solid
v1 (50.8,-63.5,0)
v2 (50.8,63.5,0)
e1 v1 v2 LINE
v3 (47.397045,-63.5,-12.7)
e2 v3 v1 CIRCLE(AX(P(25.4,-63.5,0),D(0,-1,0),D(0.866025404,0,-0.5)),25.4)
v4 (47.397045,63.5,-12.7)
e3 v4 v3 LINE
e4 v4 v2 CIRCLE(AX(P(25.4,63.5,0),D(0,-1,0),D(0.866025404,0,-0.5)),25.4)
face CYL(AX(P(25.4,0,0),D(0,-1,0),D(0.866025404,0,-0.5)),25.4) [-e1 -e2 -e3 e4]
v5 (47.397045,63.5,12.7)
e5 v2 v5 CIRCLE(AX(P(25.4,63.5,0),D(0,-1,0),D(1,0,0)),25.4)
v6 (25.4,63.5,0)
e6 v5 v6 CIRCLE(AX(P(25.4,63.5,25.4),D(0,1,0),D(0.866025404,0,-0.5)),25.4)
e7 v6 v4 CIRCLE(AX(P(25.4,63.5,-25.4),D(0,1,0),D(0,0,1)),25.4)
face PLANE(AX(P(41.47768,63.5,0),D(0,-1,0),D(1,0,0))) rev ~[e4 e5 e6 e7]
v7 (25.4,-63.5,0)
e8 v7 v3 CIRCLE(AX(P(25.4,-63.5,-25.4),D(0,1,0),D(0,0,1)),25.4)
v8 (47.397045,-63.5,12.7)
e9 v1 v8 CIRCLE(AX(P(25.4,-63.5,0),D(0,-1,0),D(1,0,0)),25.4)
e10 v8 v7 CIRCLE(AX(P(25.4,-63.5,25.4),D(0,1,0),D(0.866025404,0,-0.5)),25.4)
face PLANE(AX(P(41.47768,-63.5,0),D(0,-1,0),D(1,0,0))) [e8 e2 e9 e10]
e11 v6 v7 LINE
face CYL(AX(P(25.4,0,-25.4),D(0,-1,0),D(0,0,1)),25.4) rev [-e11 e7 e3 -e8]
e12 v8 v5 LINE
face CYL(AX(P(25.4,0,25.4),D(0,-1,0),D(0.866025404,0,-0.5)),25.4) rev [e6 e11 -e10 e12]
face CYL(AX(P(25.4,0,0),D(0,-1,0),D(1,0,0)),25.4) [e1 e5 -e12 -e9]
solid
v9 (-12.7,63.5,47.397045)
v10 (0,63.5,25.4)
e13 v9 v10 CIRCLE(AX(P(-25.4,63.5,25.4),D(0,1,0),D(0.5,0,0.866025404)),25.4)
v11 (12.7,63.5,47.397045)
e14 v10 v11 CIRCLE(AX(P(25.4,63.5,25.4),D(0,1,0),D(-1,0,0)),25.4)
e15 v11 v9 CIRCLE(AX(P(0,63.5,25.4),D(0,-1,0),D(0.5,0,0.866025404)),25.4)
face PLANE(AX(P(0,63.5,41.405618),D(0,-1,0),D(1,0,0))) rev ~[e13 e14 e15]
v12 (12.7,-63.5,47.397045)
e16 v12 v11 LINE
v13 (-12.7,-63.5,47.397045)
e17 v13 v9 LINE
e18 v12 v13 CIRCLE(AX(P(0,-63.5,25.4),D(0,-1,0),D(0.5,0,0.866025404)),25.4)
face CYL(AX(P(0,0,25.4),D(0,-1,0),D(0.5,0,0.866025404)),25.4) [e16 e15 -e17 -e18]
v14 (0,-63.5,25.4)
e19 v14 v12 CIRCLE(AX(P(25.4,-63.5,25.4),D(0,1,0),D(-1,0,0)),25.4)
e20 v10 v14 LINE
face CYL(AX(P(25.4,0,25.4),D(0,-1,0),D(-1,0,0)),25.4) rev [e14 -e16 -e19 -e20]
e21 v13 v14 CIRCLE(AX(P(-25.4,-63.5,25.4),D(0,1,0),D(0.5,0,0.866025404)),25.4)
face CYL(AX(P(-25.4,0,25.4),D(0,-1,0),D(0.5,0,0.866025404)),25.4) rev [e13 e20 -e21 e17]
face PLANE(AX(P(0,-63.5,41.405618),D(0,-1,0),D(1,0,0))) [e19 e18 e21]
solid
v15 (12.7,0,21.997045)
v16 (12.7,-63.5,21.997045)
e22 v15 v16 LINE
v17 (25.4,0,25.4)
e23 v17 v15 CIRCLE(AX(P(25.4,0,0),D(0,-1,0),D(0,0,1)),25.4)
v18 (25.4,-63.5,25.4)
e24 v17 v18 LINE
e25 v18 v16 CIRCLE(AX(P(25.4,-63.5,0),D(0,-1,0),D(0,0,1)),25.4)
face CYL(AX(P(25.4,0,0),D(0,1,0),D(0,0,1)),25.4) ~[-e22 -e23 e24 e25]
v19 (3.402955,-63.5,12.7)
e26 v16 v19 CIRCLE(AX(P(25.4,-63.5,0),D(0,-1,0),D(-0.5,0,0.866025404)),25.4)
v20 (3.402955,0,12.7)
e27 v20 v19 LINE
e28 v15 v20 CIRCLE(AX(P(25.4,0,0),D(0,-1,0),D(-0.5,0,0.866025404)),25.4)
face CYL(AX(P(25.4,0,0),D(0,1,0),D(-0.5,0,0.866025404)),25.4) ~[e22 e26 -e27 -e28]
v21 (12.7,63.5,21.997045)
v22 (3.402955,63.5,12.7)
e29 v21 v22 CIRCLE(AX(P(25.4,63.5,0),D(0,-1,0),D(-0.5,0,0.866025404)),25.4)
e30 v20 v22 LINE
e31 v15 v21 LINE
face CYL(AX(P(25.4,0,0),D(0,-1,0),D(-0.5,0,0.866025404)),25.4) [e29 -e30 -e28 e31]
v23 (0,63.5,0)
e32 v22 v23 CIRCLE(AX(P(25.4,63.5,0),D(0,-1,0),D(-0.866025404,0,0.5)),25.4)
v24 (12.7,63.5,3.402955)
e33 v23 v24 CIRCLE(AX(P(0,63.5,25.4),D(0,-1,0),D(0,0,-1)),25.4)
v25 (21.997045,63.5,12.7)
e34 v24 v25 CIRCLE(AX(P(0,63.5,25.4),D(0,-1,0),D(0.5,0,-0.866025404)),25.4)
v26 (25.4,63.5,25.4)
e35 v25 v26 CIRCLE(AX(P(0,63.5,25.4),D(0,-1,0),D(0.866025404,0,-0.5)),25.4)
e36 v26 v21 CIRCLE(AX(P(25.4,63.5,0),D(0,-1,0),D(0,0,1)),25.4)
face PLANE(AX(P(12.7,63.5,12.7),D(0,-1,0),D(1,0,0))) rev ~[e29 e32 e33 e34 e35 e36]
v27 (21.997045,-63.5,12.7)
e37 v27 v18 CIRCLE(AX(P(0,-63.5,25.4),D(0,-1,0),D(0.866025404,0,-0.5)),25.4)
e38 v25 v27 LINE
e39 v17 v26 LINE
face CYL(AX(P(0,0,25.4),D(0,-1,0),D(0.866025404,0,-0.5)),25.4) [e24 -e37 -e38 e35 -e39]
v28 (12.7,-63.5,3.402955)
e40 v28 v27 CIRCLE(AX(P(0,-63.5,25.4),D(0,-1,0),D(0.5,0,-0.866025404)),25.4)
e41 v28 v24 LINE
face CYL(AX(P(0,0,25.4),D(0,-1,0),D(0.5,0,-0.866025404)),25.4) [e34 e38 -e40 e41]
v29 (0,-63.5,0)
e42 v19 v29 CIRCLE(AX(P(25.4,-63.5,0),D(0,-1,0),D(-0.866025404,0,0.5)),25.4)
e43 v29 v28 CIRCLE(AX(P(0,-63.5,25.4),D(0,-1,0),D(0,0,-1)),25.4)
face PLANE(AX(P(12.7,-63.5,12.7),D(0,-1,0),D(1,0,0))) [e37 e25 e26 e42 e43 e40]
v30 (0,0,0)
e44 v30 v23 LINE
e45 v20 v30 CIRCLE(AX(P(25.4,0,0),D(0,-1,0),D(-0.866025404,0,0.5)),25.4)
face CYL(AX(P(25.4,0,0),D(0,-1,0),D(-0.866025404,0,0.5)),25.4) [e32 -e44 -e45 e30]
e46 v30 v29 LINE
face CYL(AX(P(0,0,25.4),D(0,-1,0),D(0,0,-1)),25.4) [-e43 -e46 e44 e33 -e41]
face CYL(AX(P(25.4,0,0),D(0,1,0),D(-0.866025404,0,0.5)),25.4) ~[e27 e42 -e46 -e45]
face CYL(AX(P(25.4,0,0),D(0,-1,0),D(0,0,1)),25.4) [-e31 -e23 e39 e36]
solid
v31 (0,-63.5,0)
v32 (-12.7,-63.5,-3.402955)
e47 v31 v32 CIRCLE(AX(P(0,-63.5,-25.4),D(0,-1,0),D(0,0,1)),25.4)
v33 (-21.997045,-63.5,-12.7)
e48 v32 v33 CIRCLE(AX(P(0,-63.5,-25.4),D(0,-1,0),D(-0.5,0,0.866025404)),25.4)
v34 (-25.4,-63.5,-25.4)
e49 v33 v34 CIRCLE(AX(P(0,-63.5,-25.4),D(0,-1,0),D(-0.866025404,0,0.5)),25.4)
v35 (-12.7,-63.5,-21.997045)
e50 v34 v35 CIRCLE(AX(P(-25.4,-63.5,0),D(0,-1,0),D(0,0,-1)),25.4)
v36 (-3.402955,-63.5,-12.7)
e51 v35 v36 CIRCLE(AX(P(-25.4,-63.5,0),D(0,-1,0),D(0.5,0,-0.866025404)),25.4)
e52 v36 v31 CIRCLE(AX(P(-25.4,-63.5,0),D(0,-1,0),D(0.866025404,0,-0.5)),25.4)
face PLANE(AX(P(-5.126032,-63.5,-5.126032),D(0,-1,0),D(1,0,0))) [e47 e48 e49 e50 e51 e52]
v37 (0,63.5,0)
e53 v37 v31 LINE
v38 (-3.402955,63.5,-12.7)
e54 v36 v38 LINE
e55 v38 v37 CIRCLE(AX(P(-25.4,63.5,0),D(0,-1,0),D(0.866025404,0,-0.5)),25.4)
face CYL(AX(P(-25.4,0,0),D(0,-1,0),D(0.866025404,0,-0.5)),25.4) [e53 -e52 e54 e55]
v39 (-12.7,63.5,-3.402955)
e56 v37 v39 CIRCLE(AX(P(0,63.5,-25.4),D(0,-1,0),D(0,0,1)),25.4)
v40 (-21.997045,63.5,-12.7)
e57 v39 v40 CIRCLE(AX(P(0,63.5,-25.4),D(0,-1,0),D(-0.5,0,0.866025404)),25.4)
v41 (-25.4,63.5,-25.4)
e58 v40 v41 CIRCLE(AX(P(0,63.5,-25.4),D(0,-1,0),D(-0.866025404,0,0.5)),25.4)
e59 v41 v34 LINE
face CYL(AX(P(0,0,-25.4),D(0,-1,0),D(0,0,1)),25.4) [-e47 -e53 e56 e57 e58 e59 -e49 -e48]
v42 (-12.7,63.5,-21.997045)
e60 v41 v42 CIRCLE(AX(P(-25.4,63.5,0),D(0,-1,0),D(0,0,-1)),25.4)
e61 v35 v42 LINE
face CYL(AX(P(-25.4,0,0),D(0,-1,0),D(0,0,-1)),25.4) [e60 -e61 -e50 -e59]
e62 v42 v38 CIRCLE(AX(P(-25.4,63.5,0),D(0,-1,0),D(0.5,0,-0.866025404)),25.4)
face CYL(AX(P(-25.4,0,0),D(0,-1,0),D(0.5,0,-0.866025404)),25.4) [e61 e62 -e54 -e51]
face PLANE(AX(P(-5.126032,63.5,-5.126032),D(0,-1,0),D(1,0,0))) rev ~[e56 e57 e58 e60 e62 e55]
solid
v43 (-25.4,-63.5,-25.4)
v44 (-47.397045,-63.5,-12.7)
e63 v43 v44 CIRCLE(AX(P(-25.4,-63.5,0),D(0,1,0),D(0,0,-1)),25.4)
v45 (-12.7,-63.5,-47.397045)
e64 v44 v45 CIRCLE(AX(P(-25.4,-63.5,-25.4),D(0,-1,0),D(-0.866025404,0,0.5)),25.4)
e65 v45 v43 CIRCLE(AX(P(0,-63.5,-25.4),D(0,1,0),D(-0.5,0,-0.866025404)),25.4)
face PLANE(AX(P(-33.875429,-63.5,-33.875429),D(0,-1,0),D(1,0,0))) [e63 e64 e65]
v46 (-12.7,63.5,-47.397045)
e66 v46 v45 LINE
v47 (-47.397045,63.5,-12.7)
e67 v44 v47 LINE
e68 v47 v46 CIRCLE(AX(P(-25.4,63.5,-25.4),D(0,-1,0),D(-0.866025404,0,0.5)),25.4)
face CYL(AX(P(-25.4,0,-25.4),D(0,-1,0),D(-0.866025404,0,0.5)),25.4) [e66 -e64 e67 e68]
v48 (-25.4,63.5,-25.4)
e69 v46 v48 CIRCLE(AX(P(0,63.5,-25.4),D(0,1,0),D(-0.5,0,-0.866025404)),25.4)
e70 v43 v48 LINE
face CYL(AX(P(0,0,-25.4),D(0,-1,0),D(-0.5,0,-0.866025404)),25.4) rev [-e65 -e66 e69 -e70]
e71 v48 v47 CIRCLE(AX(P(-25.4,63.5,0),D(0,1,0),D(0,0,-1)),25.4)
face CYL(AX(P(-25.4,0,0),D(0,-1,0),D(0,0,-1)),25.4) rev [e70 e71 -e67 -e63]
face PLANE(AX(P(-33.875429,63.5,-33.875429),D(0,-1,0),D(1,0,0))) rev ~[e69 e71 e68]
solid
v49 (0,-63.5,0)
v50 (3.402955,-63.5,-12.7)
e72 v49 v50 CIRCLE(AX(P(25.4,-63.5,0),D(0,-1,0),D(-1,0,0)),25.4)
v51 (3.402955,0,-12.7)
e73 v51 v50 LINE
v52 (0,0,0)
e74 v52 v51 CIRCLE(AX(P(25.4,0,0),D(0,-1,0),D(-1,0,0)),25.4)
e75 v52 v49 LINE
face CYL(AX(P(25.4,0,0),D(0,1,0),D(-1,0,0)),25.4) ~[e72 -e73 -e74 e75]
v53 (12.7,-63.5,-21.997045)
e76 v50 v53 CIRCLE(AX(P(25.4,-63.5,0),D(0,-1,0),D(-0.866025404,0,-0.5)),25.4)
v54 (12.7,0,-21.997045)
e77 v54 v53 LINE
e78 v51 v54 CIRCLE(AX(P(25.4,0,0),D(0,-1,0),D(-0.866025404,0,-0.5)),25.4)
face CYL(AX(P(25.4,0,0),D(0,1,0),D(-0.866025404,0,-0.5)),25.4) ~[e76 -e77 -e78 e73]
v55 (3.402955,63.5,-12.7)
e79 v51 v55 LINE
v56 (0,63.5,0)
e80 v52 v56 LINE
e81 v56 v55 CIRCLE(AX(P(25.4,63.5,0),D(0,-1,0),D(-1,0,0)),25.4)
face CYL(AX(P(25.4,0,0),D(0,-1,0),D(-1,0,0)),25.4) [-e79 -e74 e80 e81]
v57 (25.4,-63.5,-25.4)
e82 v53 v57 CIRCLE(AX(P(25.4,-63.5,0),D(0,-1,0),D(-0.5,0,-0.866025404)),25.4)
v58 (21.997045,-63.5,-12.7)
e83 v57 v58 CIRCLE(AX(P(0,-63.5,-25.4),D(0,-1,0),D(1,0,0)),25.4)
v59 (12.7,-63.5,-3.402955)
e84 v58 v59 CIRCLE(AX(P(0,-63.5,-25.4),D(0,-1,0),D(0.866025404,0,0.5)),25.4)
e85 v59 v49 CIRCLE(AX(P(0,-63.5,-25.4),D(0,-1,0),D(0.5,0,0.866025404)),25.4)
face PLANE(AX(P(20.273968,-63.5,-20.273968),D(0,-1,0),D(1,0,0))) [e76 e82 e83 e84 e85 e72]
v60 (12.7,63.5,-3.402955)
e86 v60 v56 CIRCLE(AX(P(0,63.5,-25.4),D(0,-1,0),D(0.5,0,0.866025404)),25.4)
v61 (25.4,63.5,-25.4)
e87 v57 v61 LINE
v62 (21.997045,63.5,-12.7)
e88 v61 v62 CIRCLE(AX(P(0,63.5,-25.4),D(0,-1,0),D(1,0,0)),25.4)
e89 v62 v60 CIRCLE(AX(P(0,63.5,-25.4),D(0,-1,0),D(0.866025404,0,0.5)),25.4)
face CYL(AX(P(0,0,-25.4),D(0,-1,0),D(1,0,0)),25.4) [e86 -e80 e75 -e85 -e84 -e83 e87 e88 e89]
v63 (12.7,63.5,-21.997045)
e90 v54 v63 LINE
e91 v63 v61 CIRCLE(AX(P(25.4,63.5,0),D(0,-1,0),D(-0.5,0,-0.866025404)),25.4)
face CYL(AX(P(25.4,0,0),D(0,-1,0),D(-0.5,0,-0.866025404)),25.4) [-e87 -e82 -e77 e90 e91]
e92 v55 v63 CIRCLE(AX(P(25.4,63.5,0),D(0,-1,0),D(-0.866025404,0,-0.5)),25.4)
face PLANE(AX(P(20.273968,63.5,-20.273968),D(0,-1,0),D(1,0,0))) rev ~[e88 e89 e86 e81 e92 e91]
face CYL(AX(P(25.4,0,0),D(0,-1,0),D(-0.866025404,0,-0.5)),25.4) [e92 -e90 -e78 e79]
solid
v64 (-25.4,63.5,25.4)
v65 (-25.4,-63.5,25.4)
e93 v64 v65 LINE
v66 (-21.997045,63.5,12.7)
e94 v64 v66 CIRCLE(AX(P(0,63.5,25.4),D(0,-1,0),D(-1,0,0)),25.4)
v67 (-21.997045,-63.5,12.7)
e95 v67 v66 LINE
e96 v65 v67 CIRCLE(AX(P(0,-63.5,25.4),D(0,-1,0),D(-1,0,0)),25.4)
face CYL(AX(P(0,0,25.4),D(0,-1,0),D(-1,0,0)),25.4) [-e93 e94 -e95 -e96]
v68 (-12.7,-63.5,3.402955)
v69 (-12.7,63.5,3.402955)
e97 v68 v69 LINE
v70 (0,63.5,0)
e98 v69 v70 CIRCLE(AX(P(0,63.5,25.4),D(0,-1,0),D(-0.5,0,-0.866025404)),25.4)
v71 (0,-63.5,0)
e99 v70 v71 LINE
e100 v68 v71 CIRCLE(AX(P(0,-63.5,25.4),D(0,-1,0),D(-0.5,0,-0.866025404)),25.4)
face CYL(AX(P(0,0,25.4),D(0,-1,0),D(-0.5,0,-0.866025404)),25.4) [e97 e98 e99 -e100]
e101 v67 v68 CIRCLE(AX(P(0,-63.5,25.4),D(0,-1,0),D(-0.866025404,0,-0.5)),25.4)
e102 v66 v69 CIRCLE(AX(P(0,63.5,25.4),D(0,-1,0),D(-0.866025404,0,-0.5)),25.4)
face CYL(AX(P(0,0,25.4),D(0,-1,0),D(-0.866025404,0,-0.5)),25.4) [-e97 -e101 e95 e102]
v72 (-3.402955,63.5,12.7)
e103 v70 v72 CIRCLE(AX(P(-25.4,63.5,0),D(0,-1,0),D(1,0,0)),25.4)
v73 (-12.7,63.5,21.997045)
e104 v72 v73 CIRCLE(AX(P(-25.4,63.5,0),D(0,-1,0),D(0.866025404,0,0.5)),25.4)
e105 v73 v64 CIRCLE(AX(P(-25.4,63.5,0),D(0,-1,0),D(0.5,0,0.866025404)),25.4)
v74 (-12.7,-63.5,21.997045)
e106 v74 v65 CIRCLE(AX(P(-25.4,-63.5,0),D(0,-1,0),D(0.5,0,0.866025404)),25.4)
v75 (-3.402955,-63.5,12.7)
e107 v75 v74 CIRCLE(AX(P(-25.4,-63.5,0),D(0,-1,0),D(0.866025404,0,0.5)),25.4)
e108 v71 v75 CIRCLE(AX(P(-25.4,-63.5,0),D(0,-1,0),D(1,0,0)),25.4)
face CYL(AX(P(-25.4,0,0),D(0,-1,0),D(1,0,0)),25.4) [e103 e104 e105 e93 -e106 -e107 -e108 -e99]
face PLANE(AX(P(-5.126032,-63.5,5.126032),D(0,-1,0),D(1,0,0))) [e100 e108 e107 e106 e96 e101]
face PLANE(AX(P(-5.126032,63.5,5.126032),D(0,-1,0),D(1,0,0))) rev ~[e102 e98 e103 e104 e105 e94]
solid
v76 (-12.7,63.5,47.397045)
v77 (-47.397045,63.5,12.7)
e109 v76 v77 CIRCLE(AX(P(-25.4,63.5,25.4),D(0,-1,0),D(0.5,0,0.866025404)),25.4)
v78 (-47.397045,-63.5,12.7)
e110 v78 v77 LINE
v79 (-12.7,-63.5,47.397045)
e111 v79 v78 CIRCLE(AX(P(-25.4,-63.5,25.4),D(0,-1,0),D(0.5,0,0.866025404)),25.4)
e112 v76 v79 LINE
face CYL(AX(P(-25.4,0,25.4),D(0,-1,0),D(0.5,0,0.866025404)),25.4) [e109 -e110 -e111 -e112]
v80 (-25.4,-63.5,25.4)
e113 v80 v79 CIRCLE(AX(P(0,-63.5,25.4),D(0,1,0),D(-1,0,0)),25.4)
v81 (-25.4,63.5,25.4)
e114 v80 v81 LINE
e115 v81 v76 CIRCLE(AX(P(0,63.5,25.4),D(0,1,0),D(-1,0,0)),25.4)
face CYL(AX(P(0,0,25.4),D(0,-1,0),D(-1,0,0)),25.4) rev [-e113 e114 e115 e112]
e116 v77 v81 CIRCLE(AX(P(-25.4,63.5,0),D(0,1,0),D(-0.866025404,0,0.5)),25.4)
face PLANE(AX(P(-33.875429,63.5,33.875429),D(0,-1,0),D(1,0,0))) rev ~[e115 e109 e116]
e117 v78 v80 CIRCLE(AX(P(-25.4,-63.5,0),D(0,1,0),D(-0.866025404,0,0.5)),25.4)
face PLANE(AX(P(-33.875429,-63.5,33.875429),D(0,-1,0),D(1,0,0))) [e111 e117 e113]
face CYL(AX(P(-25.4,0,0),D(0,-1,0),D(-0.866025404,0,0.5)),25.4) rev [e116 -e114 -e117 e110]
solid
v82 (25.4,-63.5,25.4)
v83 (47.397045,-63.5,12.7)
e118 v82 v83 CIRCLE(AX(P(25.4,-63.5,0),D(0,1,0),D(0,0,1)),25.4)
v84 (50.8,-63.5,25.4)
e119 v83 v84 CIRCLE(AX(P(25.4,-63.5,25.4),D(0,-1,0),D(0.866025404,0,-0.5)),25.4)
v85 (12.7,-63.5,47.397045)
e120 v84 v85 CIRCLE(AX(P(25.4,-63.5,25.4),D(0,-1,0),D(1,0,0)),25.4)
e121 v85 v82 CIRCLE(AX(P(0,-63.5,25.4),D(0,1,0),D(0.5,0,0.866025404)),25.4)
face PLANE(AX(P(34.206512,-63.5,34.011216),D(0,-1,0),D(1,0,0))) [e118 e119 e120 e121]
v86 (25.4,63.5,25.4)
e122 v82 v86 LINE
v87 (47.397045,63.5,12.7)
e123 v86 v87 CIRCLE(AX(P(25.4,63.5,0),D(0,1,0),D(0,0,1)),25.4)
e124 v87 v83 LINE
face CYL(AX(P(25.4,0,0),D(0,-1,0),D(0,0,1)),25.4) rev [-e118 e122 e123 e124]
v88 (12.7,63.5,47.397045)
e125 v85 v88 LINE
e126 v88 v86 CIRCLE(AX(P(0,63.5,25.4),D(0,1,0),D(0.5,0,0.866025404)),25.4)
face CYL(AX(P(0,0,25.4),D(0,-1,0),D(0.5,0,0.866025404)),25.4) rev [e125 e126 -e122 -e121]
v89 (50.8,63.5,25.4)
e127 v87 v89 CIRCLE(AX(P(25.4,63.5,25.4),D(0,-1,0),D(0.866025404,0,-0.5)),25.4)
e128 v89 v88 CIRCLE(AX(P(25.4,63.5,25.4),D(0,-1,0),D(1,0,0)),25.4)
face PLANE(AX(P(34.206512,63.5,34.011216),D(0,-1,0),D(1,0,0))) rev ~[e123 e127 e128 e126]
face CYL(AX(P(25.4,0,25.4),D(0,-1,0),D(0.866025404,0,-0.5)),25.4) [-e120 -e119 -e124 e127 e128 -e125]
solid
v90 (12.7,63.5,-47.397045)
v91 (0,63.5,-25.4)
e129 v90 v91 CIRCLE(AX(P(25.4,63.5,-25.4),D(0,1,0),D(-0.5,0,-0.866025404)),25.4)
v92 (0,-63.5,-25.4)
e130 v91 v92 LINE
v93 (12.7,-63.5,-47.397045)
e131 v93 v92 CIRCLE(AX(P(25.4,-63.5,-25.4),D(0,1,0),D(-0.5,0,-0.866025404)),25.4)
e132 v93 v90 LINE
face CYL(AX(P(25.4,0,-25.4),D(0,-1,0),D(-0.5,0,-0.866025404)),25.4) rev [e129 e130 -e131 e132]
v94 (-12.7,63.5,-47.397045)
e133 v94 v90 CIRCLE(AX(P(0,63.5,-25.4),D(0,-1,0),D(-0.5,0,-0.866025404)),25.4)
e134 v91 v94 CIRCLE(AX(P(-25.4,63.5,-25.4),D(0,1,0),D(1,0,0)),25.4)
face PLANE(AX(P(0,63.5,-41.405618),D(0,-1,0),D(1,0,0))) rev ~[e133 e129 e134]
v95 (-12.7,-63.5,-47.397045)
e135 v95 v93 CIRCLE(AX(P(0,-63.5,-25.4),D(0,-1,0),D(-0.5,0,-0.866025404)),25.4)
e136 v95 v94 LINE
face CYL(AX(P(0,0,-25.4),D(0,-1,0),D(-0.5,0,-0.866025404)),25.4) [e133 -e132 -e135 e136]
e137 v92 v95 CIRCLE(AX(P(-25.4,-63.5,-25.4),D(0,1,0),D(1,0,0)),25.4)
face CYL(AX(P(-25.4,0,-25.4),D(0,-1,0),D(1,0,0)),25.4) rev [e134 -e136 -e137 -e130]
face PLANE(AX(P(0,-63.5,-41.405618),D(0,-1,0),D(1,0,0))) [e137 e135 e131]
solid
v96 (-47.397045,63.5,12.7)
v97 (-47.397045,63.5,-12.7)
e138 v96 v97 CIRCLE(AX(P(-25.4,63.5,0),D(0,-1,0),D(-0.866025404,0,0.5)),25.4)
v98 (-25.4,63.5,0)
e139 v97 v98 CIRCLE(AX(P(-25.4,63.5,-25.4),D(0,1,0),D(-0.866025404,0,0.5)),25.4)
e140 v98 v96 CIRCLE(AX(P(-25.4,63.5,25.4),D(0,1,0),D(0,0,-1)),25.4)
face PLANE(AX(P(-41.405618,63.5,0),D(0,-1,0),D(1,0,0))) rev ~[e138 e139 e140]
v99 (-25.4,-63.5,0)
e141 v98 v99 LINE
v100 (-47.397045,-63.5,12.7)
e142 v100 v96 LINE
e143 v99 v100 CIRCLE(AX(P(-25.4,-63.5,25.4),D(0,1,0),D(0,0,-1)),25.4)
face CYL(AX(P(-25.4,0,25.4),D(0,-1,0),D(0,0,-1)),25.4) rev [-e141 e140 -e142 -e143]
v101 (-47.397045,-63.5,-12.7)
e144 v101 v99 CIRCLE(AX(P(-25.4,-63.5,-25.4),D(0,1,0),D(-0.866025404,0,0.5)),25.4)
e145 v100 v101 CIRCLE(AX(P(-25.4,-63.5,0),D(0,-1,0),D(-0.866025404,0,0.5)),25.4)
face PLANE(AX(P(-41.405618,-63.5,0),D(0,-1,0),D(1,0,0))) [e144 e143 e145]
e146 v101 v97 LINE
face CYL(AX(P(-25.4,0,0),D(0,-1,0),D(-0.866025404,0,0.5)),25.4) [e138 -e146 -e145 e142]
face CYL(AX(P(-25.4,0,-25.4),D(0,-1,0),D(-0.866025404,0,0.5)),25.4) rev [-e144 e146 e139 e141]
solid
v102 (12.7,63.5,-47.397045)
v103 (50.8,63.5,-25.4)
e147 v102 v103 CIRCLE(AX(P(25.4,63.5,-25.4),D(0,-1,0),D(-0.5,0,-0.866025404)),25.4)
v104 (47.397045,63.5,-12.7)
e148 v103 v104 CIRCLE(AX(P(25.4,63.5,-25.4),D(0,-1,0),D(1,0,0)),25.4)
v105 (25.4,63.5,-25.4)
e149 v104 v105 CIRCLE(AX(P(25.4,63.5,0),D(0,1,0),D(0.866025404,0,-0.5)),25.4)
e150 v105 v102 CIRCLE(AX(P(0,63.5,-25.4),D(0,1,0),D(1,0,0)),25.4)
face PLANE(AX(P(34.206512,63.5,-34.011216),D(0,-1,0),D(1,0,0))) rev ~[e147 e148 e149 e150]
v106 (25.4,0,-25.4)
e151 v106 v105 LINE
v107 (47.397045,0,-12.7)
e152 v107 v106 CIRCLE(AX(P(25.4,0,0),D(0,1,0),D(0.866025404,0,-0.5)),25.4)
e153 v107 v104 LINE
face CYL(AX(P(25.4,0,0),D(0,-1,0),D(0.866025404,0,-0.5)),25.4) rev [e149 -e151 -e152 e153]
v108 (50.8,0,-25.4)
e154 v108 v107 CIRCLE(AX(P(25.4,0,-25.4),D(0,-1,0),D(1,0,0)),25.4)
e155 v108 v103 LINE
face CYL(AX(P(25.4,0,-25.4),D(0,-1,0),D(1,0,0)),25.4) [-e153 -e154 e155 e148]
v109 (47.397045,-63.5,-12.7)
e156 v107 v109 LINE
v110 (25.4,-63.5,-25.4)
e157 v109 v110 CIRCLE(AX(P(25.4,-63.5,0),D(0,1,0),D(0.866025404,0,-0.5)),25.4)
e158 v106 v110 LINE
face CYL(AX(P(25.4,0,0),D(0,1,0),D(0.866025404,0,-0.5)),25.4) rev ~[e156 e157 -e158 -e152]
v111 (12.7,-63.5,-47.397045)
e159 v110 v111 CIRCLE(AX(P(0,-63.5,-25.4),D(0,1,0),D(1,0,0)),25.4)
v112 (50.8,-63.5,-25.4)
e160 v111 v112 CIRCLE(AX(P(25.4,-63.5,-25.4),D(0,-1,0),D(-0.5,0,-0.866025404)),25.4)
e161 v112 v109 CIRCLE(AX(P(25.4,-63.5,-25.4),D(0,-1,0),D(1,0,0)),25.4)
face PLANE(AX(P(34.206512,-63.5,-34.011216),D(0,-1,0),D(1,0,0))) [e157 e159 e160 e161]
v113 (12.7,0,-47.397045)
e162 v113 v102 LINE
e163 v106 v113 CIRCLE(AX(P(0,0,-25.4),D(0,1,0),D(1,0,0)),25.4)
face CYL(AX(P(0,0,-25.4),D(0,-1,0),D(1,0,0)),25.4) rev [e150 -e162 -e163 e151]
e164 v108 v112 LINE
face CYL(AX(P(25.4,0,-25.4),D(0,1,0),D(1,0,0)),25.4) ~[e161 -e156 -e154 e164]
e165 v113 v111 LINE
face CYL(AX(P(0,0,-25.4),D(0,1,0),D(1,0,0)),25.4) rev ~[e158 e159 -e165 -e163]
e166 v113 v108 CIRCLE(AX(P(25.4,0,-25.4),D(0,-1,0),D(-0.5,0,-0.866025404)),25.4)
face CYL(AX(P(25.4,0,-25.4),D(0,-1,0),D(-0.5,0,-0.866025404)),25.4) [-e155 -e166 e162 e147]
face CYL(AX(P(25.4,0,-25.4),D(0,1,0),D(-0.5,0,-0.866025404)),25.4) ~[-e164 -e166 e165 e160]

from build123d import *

# Parameters (mm, degrees)
F1_DEPTH = 63.5


with BuildPart() as f1:
    # F0 (on Front) → F1 (new body, symmetric)
    with BuildSketch(Plane.XZ):
        with BuildLine():
            ThreePointArc((47.3970452561, 12.7), (38.1, 3.4029547439), (25.4, 0))
            ThreePointArc((25.4, 0), (38.1, -3.4029547439), (47.3970452561, -12.7))
            ThreePointArc((47.3970452561, -12.7), (49.9345159877, -6.5740037456), (50.8, 0))
            ThreePointArc((50.8, 0), (49.9345159877, 6.5740037456), (47.3970452561, 12.7))
        make_face()
    extrude(amount=F1_DEPTH, both=True)


with BuildPart() as f1b:
    # F0 (on Front) → F1, piece 2 (new body, symmetric)
    with BuildSketch(Plane.XZ):
        with BuildLine():
            ThreePointArc((12.7, 3.4029547439), (17.9605122421, 7.4394877579), (21.9970452561, 12.7))
            ThreePointArc((21.9970452561, 12.7), (17.9605122421, 17.9605122421), (12.7, 21.9970452561))
            ThreePointArc((12.7, 21.9970452561), (7.4394877579, 17.9605122421), (3.4029547439, 12.7))
            ThreePointArc((3.4029547439, 12.7), (7.4394877579, 7.4394877579), (12.7, 3.4029547439))
        make_face()
        with BuildLine():
            ThreePointArc((12.7, 21.9970452561), (17.9605122421, 17.9605122421), (21.9970452561, 12.7))
            ThreePointArc((21.9970452561, 12.7), (24.5345159877, 18.8259962544), (25.4, 25.4))
            ThreePointArc((25.4, 25.4), (18.8259962544, 24.5345159877), (12.7, 21.9970452561))
        make_face()
        with BuildLine():
            ThreePointArc((0, 0), (6.5740037456, 0.8654840123), (12.7, 3.4029547439))
            ThreePointArc((12.7, 3.4029547439), (7.4394877579, 7.4394877579), (3.4029547439, 12.7))
            ThreePointArc((3.4029547439, 12.7), (0.8654840123, 6.5740037456), (0, 0))
        make_face()
    extrude(amount=F1_DEPTH, both=True)


with BuildPart() as f1c:
    # F0 (on Front) → F1, piece 3 (new body, symmetric)
    with BuildSketch(Plane.XZ):
        with BuildLine():
            ThreePointArc((25.4, -25.4), (24.5345159877, -18.8259962544), (21.9970452561, -12.7))
            ThreePointArc((21.9970452561, -12.7), (17.9605122421, -17.9605122421), (12.7, -21.9970452561))
            ThreePointArc((12.7, -21.9970452561), (18.8259962544, -24.5345159877), (25.4, -25.4))
        make_face()
        with BuildLine():
            ThreePointArc((12.7, -21.9970452561), (17.9605122421, -17.9605122421), (21.9970452561, -12.7))
            ThreePointArc((21.9970452561, -12.7), (17.9605122421, -7.4394877579), (12.7, -3.4029547439))
            ThreePointArc((12.7, -3.4029547439), (7.4394877579, -7.4394877579), (3.4029547439, -12.7))
            ThreePointArc((3.4029547439, -12.7), (7.4394877579, -17.9605122421), (12.7, -21.9970452561))
        make_face()
        with BuildLine():
            ThreePointArc((3.4029547439, -12.7), (7.4394877579, -7.4394877579), (12.7, -3.4029547439))
            ThreePointArc((12.7, -3.4029547439), (6.5740037456, -0.8654840123), (0, 0))
            ThreePointArc((0, 0), (0.8654840123, -6.5740037456), (3.4029547439, -12.7))
        make_face()
    extrude(amount=F1_DEPTH, both=True)


with BuildPart() as f1d:
    # F0 (on Front) → F1, piece 4 (new body, symmetric)
    with BuildSketch(Plane.XZ):
        with BuildLine():
            ThreePointArc((25.4, 25.4), (38.1, 21.9970452561), (47.3970452561, 12.7))
            ThreePointArc((47.3970452561, 12.7), (49.9345159877, 18.8259962544), (50.8, 25.4))
            ThreePointArc((50.8, 25.4), (38.1, 47.3970452561), (12.7, 47.3970452561))
            ThreePointArc((12.7, 47.3970452561), (21.9970452561, 38.1), (25.4, 25.4))
        make_face()
    extrude(amount=F1_DEPTH, both=True)


with BuildPart() as f1e:
    # F0 (on Front) → F1, piece 5 (new body, symmetric)
    with BuildSketch(Plane.XZ):
        with BuildLine():
            ThreePointArc((50.8, -25.4), (49.9345159877, -18.8259962544), (47.3970452561, -12.7))
            ThreePointArc((47.3970452561, -12.7), (38.1, -21.9970452561), (25.4, -25.4))
            ThreePointArc((25.4, -25.4), (21.9970452561, -38.1), (12.7, -47.3970452561))
            ThreePointArc((12.7, -47.3970452561), (38.1, -47.3970452561), (50.8, -25.4))
        make_face()
    extrude(amount=F1_DEPTH, both=True)


with BuildPart() as f1f:
    # F0 (on Front) → F1, piece 6 (new body, symmetric)
    with BuildSketch(Plane.XZ):
        with BuildLine():
            ThreePointArc((-3.4029547439, -12.7), (-0.8654840123, -6.5740037456), (0, 0))
            ThreePointArc((0, 0), (-6.5740037456, -0.8654840123), (-12.7, -3.4029547439))
            ThreePointArc((-12.7, -3.4029547439), (-7.4394877579, -7.4394877579), (-3.4029547439, -12.7))
        make_face()
        with BuildLine():
            ThreePointArc((-3.4029547439, -12.7), (-7.4394877579, -7.4394877579), (-12.7, -3.4029547439))
            ThreePointArc((-12.7, -3.4029547439), (-17.9605122421, -7.4394877579), (-21.9970452561, -12.7))
            ThreePointArc((-21.9970452561, -12.7), (-17.9605122421, -17.9605122421), (-12.7, -21.9970452561))
            ThreePointArc((-12.7, -21.9970452561), (-7.4394877579, -17.9605122421), (-3.4029547439, -12.7))
        make_face()
        with BuildLine():
            ThreePointArc((-25.4, -25.4), (-18.8259962544, -24.5345159877), (-12.7, -21.9970452561))
            ThreePointArc((-12.7, -21.9970452561), (-17.9605122421, -17.9605122421), (-21.9970452561, -12.7))
            ThreePointArc((-21.9970452561, -12.7), (-24.5345159877, -18.8259962544), (-25.4, -25.4))
        make_face()
    extrude(amount=F1_DEPTH, both=True)


with BuildPart() as f1g:
    # F0 (on Front) → F1, piece 7 (new body, symmetric)
    with BuildSketch(Plane.XZ):
        with BuildLine():
            ThreePointArc((-12.7, 3.4029547439), (-6.5740037456, 0.8654840123), (0, 0))
            ThreePointArc((0, 0), (-0.8654840123, 6.5740037456), (-3.4029547439, 12.7))
            ThreePointArc((-3.4029547439, 12.7), (-7.4394877579, 7.4394877579), (-12.7, 3.4029547439))
        make_face()
        with BuildLine():
            ThreePointArc((-21.9970452561, 12.7), (-17.9605122421, 7.4394877579), (-12.7, 3.4029547439))
            ThreePointArc((-12.7, 3.4029547439), (-7.4394877579, 7.4394877579), (-3.4029547439, 12.7))
            ThreePointArc((-3.4029547439, 12.7), (-7.4394877579, 17.9605122421), (-12.7, 21.9970452561))
            ThreePointArc((-12.7, 21.9970452561), (-17.9605122421, 17.9605122421), (-21.9970452561, 12.7))
        make_face()
        with BuildLine():
            ThreePointArc((-21.9970452561, 12.7), (-17.9605122421, 17.9605122421), (-12.7, 21.9970452561))
            ThreePointArc((-12.7, 21.9970452561), (-18.8259962544, 24.5345159877), (-25.4, 25.4))
            ThreePointArc((-25.4, 25.4), (-24.5345159877, 18.8259962544), (-21.9970452561, 12.7))
        make_face()
    extrude(amount=F1_DEPTH, both=True)


with BuildPart() as f1h:
    # F0 (on Front) → F1, piece 8 (new body, symmetric)
    with BuildSketch(Plane.XZ):
        with BuildLine():
            ThreePointArc((-12.7, 47.3970452561), (-3.4029547439, 38.1), (0, 25.4))
            ThreePointArc((0, 25.4), (3.4029547439, 38.1), (12.7, 47.3970452561))
            ThreePointArc((12.7, 47.3970452561), (0, 50.8), (-12.7, 47.3970452561))
        make_face()
    extrude(amount=F1_DEPTH, both=True)


with BuildPart() as f1i:
    # F0 (on Front) → F1, piece 9 (new body, symmetric)
    with BuildSketch(Plane.XZ):
        with BuildLine():
            ThreePointArc((12.7, -47.3970452561), (3.4029547439, -38.1), (0, -25.4))
            ThreePointArc((0, -25.4), (-3.4029547439, -38.1), (-12.7, -47.3970452561))
            ThreePointArc((-12.7, -47.3970452561), (0, -50.8), (12.7, -47.3970452561))
        make_face()
    extrude(amount=F1_DEPTH, both=True)


with BuildPart() as f1j:
    # F0 (on Front) → F1, piece 10 (new body, symmetric)
    with BuildSketch(Plane.XZ):
        with BuildLine():
            ThreePointArc((-25.4, 25.4), (-21.9970452561, 38.1), (-12.7, 47.3970452561))
            ThreePointArc((-12.7, 47.3970452561), (-43.3605122421, 43.3605122421), (-47.3970452561, 12.7))
            ThreePointArc((-47.3970452561, 12.7), (-38.1, 21.9970452561), (-25.4, 25.4))
        make_face()
    extrude(amount=F1_DEPTH, both=True)


with BuildPart() as f1k:
    # F0 (on Front) → F1, piece 11 (new body, symmetric)
    with BuildSketch(Plane.XZ):
        with BuildLine():
            ThreePointArc((-47.3970452561, -12.7), (-43.3605122421, -43.3605122421), (-12.7, -47.3970452561))
            ThreePointArc((-12.7, -47.3970452561), (-21.9970452561, -38.1), (-25.4, -25.4))
            ThreePointArc((-25.4, -25.4), (-38.1, -21.9970452561), (-47.3970452561, -12.7))
        make_face()
    extrude(amount=F1_DEPTH, both=True)


with BuildPart() as f1l:
    # F0 (on Front) → F1, piece 12 (new body, symmetric)
    with BuildSketch(Plane.XZ):
        with BuildLine():
            ThreePointArc((-47.3970452561, -12.7), (-38.1, -3.4029547439), (-25.4, 0))
            ThreePointArc((-25.4, 0), (-38.1, 3.4029547439), (-47.3970452561, 12.7))
            ThreePointArc((-47.3970452561, 12.7), (-50.8, 0), (-47.3970452561, -12.7))
        make_face()
    extrude(amount=F1_DEPTH, both=True)


solid = Compound([f1.part, f1b.part, f1c.part, f1d.part, f1e.part, f1f.part, f1g.part, f1h.part, f1i.part, f1j.part, f1k.part, f1l.part])
